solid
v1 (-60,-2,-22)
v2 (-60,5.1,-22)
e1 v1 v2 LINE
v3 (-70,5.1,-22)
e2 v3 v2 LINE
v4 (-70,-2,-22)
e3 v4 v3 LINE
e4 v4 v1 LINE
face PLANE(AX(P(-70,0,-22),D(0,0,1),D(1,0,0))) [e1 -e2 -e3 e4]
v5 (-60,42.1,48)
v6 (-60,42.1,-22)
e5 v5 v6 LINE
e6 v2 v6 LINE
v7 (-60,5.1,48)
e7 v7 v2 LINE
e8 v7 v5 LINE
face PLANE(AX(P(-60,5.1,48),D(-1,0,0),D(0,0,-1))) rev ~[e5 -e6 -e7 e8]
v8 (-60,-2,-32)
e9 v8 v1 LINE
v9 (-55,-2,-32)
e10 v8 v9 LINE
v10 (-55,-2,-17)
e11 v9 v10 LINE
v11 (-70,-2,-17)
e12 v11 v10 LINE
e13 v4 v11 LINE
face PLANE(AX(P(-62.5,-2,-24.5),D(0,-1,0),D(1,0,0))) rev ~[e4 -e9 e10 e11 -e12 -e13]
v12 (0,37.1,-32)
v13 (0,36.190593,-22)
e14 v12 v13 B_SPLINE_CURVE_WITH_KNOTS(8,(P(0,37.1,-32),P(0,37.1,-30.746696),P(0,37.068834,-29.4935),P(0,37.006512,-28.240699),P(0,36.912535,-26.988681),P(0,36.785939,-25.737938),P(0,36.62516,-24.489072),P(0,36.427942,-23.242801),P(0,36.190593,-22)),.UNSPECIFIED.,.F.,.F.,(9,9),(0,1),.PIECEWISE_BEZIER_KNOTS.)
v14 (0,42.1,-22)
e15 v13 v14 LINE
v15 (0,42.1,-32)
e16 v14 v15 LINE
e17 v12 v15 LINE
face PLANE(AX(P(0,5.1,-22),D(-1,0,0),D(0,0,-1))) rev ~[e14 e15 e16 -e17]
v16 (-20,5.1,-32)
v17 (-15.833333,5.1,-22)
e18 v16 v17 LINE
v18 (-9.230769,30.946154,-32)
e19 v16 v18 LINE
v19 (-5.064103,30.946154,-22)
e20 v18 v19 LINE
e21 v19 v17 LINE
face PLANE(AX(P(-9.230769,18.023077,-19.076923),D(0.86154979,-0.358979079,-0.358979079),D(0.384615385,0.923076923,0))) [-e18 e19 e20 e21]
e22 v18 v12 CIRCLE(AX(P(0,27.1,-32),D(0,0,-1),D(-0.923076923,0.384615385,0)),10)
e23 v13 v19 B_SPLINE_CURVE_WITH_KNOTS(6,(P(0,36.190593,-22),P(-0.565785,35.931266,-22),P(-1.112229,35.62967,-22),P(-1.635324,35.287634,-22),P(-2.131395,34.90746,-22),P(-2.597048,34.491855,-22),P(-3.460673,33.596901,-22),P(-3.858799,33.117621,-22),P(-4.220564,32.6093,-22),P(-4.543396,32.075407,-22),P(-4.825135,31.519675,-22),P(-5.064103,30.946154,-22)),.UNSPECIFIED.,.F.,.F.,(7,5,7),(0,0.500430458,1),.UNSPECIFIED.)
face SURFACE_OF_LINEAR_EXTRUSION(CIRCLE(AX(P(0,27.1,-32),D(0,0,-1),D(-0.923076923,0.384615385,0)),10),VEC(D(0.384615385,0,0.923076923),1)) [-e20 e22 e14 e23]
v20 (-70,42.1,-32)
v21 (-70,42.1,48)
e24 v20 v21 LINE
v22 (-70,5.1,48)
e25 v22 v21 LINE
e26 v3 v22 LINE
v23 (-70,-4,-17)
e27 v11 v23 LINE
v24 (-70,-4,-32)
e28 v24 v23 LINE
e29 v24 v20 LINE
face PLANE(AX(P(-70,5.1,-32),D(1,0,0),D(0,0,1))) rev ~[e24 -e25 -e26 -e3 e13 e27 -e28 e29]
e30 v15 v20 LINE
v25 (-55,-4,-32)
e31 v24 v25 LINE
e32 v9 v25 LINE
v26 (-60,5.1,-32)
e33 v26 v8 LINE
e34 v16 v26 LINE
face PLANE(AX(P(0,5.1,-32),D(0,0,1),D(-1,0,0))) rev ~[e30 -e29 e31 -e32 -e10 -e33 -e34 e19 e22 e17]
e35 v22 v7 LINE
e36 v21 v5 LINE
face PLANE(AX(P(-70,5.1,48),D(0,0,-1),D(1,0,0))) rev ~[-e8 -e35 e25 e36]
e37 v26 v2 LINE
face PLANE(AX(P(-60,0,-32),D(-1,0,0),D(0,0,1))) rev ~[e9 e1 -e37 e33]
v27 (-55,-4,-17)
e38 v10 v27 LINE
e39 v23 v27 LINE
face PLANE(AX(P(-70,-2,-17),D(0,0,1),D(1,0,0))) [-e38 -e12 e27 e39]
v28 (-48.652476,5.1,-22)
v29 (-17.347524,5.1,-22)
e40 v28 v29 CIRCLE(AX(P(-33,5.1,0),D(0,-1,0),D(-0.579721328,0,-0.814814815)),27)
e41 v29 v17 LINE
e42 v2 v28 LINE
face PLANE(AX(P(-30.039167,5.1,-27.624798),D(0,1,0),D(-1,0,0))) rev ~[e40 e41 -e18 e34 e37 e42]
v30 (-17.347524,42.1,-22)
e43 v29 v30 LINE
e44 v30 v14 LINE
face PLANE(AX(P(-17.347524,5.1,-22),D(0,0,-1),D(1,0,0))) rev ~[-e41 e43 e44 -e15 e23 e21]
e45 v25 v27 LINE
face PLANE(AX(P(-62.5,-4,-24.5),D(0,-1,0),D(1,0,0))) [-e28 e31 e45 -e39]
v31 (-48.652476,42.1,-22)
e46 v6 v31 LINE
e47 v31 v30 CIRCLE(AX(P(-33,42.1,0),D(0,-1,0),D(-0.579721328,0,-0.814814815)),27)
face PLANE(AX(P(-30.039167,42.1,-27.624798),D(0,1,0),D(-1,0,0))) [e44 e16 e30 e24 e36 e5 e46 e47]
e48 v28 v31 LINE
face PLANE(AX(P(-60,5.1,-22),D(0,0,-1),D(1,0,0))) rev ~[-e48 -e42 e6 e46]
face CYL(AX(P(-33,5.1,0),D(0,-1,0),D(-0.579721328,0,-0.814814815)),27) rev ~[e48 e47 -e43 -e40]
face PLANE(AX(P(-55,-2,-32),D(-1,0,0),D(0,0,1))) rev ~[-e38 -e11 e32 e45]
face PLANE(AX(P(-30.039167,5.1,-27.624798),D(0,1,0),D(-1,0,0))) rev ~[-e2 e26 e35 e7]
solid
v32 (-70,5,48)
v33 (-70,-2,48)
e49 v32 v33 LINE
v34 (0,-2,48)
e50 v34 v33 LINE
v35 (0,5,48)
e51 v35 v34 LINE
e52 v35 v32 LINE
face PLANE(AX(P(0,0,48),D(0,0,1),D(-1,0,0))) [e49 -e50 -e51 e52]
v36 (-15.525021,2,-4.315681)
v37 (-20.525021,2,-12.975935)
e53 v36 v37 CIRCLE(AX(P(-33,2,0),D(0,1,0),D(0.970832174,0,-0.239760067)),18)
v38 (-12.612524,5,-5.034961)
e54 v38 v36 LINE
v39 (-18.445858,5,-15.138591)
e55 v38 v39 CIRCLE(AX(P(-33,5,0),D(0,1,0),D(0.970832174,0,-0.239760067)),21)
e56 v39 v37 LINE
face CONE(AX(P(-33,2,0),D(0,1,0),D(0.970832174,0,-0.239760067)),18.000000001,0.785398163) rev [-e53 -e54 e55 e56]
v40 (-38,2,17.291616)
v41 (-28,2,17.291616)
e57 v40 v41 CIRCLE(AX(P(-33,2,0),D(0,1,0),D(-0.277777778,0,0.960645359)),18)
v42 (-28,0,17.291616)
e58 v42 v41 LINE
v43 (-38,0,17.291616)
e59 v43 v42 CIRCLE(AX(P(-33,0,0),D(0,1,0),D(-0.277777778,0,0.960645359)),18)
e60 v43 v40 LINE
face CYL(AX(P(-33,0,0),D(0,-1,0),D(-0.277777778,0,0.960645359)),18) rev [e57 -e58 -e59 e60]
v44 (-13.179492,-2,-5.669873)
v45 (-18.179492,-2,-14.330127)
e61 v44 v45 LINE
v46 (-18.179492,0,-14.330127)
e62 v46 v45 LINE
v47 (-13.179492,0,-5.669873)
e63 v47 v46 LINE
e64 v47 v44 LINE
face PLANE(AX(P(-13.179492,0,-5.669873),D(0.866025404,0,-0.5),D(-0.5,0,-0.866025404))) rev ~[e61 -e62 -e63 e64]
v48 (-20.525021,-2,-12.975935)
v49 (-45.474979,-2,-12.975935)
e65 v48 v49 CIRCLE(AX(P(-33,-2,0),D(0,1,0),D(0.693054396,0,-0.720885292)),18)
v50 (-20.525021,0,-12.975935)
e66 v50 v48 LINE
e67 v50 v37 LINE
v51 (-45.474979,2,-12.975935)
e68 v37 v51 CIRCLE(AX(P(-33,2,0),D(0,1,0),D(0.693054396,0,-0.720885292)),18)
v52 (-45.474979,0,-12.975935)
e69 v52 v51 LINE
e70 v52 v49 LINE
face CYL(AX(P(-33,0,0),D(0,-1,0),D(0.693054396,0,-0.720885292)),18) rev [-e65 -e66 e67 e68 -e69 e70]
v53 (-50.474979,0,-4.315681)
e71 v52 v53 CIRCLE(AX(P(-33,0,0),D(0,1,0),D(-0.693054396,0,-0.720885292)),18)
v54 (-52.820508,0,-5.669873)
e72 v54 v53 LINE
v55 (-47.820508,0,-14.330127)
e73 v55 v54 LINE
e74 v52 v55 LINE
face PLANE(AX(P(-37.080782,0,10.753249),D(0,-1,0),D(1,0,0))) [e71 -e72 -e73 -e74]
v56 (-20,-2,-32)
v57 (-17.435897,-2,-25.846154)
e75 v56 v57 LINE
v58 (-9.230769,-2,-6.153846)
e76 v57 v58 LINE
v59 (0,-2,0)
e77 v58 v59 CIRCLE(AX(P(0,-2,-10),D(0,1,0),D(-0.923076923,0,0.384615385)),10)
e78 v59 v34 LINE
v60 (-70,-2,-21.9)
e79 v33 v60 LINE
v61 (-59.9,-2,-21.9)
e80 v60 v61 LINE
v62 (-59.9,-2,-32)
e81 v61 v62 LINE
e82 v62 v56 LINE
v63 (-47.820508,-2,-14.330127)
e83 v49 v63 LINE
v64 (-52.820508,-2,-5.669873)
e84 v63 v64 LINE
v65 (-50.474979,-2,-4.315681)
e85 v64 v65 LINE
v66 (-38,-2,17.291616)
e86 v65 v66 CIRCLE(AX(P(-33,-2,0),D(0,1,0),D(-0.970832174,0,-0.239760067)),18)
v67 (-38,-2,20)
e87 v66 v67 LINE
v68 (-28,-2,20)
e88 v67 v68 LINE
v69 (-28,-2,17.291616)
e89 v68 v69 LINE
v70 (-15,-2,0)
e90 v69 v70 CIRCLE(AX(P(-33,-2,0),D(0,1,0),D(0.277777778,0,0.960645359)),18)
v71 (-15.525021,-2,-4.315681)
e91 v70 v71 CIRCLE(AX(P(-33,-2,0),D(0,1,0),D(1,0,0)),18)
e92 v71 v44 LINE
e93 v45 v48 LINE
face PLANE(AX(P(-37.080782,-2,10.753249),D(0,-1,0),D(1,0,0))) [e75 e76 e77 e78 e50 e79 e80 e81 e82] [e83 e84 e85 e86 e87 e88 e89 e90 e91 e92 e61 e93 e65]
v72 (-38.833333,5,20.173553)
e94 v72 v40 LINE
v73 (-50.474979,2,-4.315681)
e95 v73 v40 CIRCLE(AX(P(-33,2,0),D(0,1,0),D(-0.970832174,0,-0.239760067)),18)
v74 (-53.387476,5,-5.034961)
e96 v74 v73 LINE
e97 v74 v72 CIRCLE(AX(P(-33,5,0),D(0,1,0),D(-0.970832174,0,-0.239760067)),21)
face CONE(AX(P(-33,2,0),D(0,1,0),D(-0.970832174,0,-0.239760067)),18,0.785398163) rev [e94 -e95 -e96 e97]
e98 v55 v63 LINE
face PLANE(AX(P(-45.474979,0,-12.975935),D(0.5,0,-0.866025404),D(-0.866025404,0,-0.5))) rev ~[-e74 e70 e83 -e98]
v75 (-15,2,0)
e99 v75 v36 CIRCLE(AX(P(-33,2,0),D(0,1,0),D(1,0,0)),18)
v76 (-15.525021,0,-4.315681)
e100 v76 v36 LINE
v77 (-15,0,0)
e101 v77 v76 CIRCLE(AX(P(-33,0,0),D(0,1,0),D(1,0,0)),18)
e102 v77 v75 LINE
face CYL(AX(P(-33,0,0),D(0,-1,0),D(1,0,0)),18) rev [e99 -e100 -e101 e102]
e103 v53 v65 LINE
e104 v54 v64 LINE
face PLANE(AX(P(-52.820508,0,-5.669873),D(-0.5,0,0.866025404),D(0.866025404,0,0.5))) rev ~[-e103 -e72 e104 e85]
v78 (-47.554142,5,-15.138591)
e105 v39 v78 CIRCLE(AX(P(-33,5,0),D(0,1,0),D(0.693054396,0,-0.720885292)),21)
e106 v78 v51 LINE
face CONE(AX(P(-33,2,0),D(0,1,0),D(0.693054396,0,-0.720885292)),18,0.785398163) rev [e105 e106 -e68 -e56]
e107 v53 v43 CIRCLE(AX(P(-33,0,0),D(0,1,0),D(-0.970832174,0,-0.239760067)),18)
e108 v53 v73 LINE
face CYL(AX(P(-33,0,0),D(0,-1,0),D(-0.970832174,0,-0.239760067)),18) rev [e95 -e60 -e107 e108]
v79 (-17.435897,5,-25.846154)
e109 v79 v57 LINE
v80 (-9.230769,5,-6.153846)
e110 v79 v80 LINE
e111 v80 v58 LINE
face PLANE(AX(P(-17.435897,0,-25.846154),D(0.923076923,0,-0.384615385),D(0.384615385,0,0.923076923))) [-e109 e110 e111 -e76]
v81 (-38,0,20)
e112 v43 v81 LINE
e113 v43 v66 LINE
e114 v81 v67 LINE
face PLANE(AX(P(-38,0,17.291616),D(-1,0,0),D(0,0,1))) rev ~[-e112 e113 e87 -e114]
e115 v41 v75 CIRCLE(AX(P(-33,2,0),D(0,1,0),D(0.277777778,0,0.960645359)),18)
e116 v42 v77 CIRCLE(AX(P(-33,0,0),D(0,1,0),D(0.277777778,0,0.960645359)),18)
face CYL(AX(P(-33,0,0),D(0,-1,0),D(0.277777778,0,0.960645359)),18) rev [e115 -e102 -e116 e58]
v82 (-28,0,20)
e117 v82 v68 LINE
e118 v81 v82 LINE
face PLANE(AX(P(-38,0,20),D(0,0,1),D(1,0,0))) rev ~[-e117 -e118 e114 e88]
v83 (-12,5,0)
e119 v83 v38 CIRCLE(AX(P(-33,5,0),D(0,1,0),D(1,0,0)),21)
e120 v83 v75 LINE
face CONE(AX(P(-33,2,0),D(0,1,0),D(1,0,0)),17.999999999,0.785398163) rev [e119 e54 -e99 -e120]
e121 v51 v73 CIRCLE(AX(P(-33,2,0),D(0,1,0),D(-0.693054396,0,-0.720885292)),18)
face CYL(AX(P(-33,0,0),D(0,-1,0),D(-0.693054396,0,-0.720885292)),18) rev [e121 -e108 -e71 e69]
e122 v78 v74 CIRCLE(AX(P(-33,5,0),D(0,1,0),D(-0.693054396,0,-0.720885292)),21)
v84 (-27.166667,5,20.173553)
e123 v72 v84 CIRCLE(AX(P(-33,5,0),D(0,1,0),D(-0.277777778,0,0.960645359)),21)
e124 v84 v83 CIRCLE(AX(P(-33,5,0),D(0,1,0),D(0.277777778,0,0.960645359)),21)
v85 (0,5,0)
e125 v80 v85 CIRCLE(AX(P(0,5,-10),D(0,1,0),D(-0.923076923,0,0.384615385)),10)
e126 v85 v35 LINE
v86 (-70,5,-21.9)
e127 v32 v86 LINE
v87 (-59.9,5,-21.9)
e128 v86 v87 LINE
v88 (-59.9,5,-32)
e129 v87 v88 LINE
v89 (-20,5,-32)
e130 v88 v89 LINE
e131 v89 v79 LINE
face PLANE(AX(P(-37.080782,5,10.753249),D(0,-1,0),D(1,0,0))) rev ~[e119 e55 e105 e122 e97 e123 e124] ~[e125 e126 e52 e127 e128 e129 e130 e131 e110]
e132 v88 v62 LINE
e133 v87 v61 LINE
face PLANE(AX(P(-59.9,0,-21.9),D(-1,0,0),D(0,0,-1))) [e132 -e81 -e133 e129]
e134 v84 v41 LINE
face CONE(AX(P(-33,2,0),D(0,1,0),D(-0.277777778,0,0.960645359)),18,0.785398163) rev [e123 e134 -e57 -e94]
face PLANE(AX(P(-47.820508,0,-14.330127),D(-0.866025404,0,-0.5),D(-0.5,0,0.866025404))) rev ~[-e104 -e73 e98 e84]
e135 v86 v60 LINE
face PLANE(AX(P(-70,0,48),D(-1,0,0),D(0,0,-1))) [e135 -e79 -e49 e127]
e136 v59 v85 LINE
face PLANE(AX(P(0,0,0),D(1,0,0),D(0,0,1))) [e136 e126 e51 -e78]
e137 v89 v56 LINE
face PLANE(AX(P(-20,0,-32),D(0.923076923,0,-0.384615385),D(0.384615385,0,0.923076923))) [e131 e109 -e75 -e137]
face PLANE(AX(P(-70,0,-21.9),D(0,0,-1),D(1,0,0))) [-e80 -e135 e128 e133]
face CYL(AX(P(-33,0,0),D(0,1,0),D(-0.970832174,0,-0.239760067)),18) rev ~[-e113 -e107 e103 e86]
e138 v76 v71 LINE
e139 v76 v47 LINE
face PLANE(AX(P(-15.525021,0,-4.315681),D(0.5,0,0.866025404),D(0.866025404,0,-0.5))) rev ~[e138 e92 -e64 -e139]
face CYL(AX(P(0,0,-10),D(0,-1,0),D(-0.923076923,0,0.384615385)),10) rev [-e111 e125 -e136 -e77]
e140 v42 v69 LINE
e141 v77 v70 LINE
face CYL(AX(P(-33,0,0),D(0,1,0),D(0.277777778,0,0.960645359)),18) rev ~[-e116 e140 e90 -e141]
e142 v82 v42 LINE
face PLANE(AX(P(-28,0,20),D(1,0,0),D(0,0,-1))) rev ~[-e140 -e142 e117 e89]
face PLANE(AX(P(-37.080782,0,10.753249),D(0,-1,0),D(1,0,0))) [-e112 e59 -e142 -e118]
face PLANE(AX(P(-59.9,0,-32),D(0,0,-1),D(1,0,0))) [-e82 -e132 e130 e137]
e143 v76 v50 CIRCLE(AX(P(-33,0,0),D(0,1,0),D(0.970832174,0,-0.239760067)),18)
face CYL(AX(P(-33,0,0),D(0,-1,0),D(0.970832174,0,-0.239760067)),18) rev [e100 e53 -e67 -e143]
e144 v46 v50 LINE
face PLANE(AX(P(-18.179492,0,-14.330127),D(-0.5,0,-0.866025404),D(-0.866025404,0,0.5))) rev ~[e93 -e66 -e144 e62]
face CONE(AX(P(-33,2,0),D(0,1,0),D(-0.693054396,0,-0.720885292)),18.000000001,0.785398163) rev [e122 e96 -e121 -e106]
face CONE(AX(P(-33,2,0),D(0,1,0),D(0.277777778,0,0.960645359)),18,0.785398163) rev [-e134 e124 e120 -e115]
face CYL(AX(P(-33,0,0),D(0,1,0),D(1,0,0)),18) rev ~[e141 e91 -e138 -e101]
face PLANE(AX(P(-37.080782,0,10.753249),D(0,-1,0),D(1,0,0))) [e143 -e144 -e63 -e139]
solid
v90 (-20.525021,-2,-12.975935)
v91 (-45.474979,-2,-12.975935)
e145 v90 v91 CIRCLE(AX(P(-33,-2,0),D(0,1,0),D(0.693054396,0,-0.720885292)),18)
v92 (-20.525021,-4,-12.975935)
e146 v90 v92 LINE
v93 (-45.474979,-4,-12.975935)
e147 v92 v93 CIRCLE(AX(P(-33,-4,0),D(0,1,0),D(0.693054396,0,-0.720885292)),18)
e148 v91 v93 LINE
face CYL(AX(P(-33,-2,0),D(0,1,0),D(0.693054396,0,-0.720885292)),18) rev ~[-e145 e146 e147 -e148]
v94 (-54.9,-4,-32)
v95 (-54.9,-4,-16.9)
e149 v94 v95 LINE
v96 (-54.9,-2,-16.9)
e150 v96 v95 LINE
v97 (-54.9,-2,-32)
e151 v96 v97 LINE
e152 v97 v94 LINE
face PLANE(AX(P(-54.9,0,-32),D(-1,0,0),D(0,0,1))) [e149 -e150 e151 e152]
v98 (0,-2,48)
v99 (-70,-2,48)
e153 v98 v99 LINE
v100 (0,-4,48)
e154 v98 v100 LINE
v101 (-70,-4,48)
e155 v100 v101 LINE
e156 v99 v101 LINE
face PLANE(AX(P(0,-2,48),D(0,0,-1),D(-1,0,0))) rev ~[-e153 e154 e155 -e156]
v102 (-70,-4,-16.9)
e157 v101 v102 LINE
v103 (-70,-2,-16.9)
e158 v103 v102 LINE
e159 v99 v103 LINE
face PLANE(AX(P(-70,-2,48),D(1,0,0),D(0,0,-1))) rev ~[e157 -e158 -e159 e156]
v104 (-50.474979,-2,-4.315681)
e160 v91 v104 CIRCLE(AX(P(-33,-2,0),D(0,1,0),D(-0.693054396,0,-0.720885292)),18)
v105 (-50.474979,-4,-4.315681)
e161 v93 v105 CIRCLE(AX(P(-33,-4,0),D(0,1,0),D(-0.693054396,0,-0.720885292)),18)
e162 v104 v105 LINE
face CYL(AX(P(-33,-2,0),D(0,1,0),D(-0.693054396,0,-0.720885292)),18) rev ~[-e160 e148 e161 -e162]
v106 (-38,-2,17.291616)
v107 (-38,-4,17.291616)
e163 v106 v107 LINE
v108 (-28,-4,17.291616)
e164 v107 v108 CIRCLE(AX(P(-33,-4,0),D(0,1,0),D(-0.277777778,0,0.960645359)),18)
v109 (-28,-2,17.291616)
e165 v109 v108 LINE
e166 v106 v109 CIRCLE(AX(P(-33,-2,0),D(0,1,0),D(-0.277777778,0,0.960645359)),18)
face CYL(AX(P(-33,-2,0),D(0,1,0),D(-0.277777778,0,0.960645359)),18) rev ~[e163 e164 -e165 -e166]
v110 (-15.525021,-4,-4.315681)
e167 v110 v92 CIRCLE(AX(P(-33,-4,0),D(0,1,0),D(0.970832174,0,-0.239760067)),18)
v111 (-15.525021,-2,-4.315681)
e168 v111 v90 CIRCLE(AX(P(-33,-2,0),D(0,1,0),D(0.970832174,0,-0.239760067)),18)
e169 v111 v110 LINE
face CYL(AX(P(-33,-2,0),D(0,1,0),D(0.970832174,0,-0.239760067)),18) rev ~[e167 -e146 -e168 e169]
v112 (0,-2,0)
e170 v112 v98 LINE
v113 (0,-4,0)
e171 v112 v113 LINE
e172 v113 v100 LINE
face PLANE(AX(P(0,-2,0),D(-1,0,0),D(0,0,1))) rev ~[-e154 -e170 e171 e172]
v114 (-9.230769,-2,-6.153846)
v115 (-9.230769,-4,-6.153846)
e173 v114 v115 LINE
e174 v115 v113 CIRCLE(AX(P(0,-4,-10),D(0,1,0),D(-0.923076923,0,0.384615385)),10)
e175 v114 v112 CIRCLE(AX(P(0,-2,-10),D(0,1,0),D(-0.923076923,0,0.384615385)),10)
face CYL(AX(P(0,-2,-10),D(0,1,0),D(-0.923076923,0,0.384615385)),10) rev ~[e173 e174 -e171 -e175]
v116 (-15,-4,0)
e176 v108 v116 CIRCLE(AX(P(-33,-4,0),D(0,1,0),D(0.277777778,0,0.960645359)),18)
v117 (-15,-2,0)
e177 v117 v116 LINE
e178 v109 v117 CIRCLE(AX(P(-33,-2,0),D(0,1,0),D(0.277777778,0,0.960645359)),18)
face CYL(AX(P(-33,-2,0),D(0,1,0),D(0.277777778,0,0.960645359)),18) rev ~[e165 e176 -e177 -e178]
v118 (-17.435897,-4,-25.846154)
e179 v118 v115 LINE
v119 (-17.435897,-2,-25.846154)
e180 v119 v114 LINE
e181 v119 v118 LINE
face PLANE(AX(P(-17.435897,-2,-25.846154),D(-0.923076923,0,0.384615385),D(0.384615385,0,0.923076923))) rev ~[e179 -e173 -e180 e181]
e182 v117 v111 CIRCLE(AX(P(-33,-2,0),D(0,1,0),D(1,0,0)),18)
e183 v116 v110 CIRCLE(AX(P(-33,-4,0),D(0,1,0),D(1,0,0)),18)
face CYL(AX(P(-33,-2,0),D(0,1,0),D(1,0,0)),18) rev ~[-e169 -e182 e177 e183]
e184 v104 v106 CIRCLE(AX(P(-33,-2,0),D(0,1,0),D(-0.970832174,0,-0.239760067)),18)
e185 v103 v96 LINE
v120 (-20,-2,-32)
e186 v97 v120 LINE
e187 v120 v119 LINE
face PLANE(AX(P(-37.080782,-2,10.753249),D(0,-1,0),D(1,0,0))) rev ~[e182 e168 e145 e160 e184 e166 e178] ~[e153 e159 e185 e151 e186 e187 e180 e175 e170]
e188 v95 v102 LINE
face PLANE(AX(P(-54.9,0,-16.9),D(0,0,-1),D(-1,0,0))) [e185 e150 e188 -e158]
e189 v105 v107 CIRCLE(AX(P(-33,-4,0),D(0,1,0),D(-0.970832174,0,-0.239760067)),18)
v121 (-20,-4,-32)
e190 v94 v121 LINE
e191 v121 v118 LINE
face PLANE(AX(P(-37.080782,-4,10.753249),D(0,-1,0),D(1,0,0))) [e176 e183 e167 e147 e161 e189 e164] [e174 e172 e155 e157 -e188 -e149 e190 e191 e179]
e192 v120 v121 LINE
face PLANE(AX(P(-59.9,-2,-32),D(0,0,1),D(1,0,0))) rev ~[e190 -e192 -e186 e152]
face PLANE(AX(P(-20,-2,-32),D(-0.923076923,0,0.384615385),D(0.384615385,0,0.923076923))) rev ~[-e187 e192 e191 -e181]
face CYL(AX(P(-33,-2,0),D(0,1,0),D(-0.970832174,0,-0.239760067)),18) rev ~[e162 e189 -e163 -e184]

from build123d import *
from build123d import SkipClean  # not in build123d's __all__

# Parameters (mm, degrees)
F3_DEPTH       = 2
F4_DEPTH       = 5
F5_START       = 2
F5_DEPTH       = 2
F6_SIZE        = 3
F7_W           = 15
F7_H           = 15
F8_DEPTH       = 4
F9_START       = 2
F9_DEPTH       = 2
F2_W           = 10
F2_H           = 10
F10_DEPTH      = 5.1
F10_DEPTH_BACK = 2
F11_W          = 10
F11_H          = 10
F12_DEPTH      = 37


with BuildPart() as f3:
    # F2 (on Front) → F3 (new body)
    with BuildSketch(Plane.XZ):
        with BuildLine():
            Line((0, 0), (0, 48))
            Line((0, 48), (-70, 48))
            Line((-70, 48), (-70, -21.9))
            Line((-70, -21.9), (-59.9, -21.9))
            Line((-59.9, -21.9), (-59.9, -32))
            Line((-59.9, -32), (-26.6666666667, -32))
            Line((-26.6666666667, -32), (-20, -32))
            Line((-20, -32), (-17.4358974359, -25.8461538462))
            Line((-17.4358974359, -25.8461538462), (-9.2307692308, -6.1538461538))
            ThreePointArc((-9.2307692308, -6.1538461538), (-5.5470019623, -1.6794970566), (0, 0))
        make_face()
        with BuildLine():
            ThreePointArc((-28, 17.2916164658), (-18.6125054301, 10.8166538264), (-15, 0))
            ThreePointArc((-15, 0), (-15.1317372924, -2.1737497126), (-15.5250208681, -4.315681214))
            Line((-15.5250208681, -4.315681214), (-13.1794919243, -5.6698729811))
            Line((-13.1794919243, -5.6698729811), (-15.6794919243, -10))
            Line((-15.6794919243, -10), (-18.1794919243, -14.3301270189))
            Line((-18.1794919243, -14.3301270189), (-20.5250208681, -12.9759352518))
            ThreePointArc((-20.5250208681, -12.9759352518), (-33, -18), (-45.4749791319, -12.9759352518))
            Line((-45.4749791319, -12.9759352518), (-47.8205080757, -14.3301270189))
            Line((-47.8205080757, -14.3301270189), (-50.3205080757, -10))
            Line((-50.3205080757, -10), (-52.8205080757, -5.6698729811))
            Line((-52.8205080757, -5.6698729811), (-50.4749791319, -4.315681214))
            ThreePointArc((-50.4749791319, -4.315681214), (-48.5884572681, 9), (-38, 17.2916164658))
            Line((-38, 17.2916164658), (-38, 20))
            Line((-38, 20), (-33, 20))
            Line((-33, 20), (-28, 20))
            Line((-28, 20), (-28, 17.2916164658))
        make_face(mode=Mode.SUBTRACT)
    extrude(amount=F3_DEPTH)

    # F2 (on Front) → F4 (join)
    with BuildSketch(Plane.XZ):
        with BuildLine():
            Line((0, 0), (0, 48))
            Line((0, 48), (-70, 48))
            Line((-70, 48), (-70, -21.9))
            Line((-70, -21.9), (-59.9, -21.9))
            Line((-59.9, -21.9), (-59.9, -32))
            Line((-59.9, -32), (-26.6666666667, -32))
            Line((-26.6666666667, -32), (-20, -32))
            Line((-20, -32), (-17.4358974359, -25.8461538462))
            Line((-17.4358974359, -25.8461538462), (-9.2307692308, -6.1538461538))
            ThreePointArc((-9.2307692308, -6.1538461538), (-5.5470019623, -1.6794970566), (0, 0))
        make_face()
        with BuildLine():
            ThreePointArc((-28, 17.2916164658), (-18.6125054301, 10.8166538264), (-15, 0))
            ThreePointArc((-15, 0), (-15.1317372924, -2.1737497126), (-15.5250208681, -4.315681214))
            Line((-15.5250208681, -4.315681214), (-13.1794919243, -5.6698729811))
            Line((-13.1794919243, -5.6698729811), (-15.6794919243, -10))
            Line((-15.6794919243, -10), (-18.1794919243, -14.3301270189))
            Line((-18.1794919243, -14.3301270189), (-20.5250208681, -12.9759352518))
            ThreePointArc((-20.5250208681, -12.9759352518), (-33, -18), (-45.4749791319, -12.9759352518))
            Line((-45.4749791319, -12.9759352518), (-47.8205080757, -14.3301270189))
            Line((-47.8205080757, -14.3301270189), (-50.3205080757, -10))
            Line((-50.3205080757, -10), (-52.8205080757, -5.6698729811))
            Line((-52.8205080757, -5.6698729811), (-50.4749791319, -4.315681214))
            ThreePointArc((-50.4749791319, -4.315681214), (-48.5884572681, 9), (-38, 17.2916164658))
            Line((-38, 17.2916164658), (-38, 20))
            Line((-38, 20), (-33, 20))
            Line((-33, 20), (-28, 20))
            Line((-28, 20), (-28, 17.2916164658))
        make_face(mode=Mode.SUBTRACT)
        with BuildLine():
            ThreePointArc((-45.4749791319, -12.9759352518), (-48.5884572681, -9), (-50.4749791319, -4.315681214))
            Line((-50.4749791319, -4.315681214), (-52.8205080757, -5.6698729811))
            Line((-52.8205080757, -5.6698729811), (-50.3205080757, -10))
            Line((-50.3205080757, -10), (-47.8205080757, -14.3301270189))
            Line((-47.8205080757, -14.3301270189), (-45.4749791319, -12.9759352518))
        make_face()
        with BuildLine():
            Line((-13.1794919243, -5.6698729811), (-15.5250208681, -4.315681214))
            ThreePointArc((-15.5250208681, -4.315681214), (-17.4115427319, -9), (-20.5250208681, -12.9759352518))
            Line((-20.5250208681, -12.9759352518), (-18.1794919243, -14.3301270189))
            Line((-18.1794919243, -14.3301270189), (-15.6794919243, -10))
            Line((-15.6794919243, -10), (-13.1794919243, -5.6698729811))
        make_face()
        with BuildLine():
            ThreePointArc((-38, 17.2916164658), (-33, 18), (-28, 17.2916164658))
            Line((-28, 17.2916164658), (-28, 20))
            Line((-28, 20), (-33, 20))
            Line((-33, 20), (-38, 20))
            Line((-38, 20), (-38, 17.2916164658))
        make_face()
    with SkipClean():  # cleaning this boolean's faces spoils the solid; the shape is the same uncleaned
        extrude(amount=-F4_DEPTH)

    # F6
    f6_edges = [f3.edges().sort_by_distance(p)[0] for p in [
        (-28, 5, -17.291616),
    ]]
    chamfer(f6_edges, length=F6_SIZE)


with BuildPart() as f5:
    # F2 (on Front) → F5 (new body)
    with BuildSketch(Plane.XZ.offset(F5_START)):
        with BuildLine():
            Line((0, 0), (0, 48))
            Line((0, 48), (-70, 48))
            Line((-70, 48), (-70, -21.9))
            Line((-70, -21.9), (-59.9, -21.9))
            Line((-59.9, -21.9), (-59.9, -32))
            Line((-59.9, -32), (-26.6666666667, -32))
            Line((-26.6666666667, -32), (-20, -32))
            Line((-20, -32), (-17.4358974359, -25.8461538462))
            Line((-17.4358974359, -25.8461538462), (-9.2307692308, -6.1538461538))
            ThreePointArc((-9.2307692308, -6.1538461538), (-5.5470019623, -1.6794970566), (0, 0))
        make_face()
        with BuildLine():
            ThreePointArc((-28, 17.2916164658), (-18.6125054301, 10.8166538264), (-15, 0))
            ThreePointArc((-15, 0), (-15.1317372924, -2.1737497126), (-15.5250208681, -4.315681214))
            Line((-15.5250208681, -4.315681214), (-13.1794919243, -5.6698729811))
            Line((-13.1794919243, -5.6698729811), (-15.6794919243, -10))
            Line((-15.6794919243, -10), (-18.1794919243, -14.3301270189))
            Line((-18.1794919243, -14.3301270189), (-20.5250208681, -12.9759352518))
            ThreePointArc((-20.5250208681, -12.9759352518), (-33, -18), (-45.4749791319, -12.9759352518))
            Line((-45.4749791319, -12.9759352518), (-47.8205080757, -14.3301270189))
            Line((-47.8205080757, -14.3301270189), (-50.3205080757, -10))
            Line((-50.3205080757, -10), (-52.8205080757, -5.6698729811))
            Line((-52.8205080757, -5.6698729811), (-50.4749791319, -4.315681214))
            ThreePointArc((-50.4749791319, -4.315681214), (-48.5884572681, 9), (-38, 17.2916164658))
            Line((-38, 17.2916164658), (-38, 20))
            Line((-38, 20), (-33, 20))
            Line((-33, 20), (-28, 20))
            Line((-28, 20), (-28, 17.2916164658))
        make_face(mode=Mode.SUBTRACT)
        with BuildLine():
            ThreePointArc((-45.4749791319, -12.9759352518), (-48.5884572681, -9), (-50.4749791319, -4.315681214))
            Line((-50.4749791319, -4.315681214), (-52.8205080757, -5.6698729811))
            Line((-52.8205080757, -5.6698729811), (-50.3205080757, -10))
            Line((-50.3205080757, -10), (-47.8205080757, -14.3301270189))
            Line((-47.8205080757, -14.3301270189), (-45.4749791319, -12.9759352518))
        make_face()
        with BuildLine():
            Line((-13.1794919243, -5.6698729811), (-15.5250208681, -4.315681214))
            ThreePointArc((-15.5250208681, -4.315681214), (-17.4115427319, -9), (-20.5250208681, -12.9759352518))
            Line((-20.5250208681, -12.9759352518), (-18.1794919243, -14.3301270189))
            Line((-18.1794919243, -14.3301270189), (-15.6794919243, -10))
            Line((-15.6794919243, -10), (-13.1794919243, -5.6698729811))
        make_face()
        with BuildLine():
            ThreePointArc((-38, 17.2916164658), (-33, 18), (-28, 17.2916164658))
            Line((-28, 17.2916164658), (-28, 20))
            Line((-28, 20), (-33, 20))
            Line((-33, 20), (-38, 20))
            Line((-38, 20), (-38, 17.2916164658))
        make_face()
    extrude(amount=F5_DEPTH)

    # F7 (on Front) → F8 (cut)
    with BuildSketch(Plane.XZ):
        with Locations((-62.5, -24.5)):
            Rectangle(F7_W, F7_H)
        Polygon((-55, -17), (-55, -32), (-54.9, -32), (-54.9, -16.9), (-70, -16.9), (-70, -17), align=None)
    extrude(amount=F8_DEPTH, mode=Mode.SUBTRACT)


with BuildPart() as f9:
    # F7 (on Front) → F9 (new body)
    with BuildSketch(Plane.XZ.offset(F9_START)):
        with Locations((-62.5, -24.5)):
            Rectangle(F7_W, F7_H)
    extrude(amount=F9_DEPTH)

    # F2 (on Front) → F10 (join, two sides)
    with BuildSketch(Plane.XZ) as f10_sk:
        with Locations((-65, -27)):
            Rectangle(F2_W, F2_H)
    extrude(amount=-F10_DEPTH)
    extrude(f10_sk.sketch, amount=F10_DEPTH_BACK)

    # F11 (on face) → F12 (join)
    with BuildSketch(Plane(origin=(0, 5.1, 0), x_dir=(-1, 0, 0), z_dir=(0, 1, 0))):
        with BuildLine():
            Line((0, -32), (60, -32))
            Line((60, -32), (60, -22))
            Line((60, -22), (48.6524758425, -22))
            ThreePointArc((48.6524758425, -22), (33, -27), (17.3475241575, -22))
            Line((17.3475241575, -22), (0, -22))
            Line((0, -22), (0, -32))
        make_face()
        Polygon((60, -22), (70, -22), (70, 48), (60, 48), (60, 0), align=None)
        with Locations((65, -27)):
            Rectangle(F11_W, F11_H)
    extrude(amount=F12_DEPTH)

    # F14: sweep along a path in F14_path
    with BuildLine(Plane(origin=(-20, 5, -32), x_dir=(-0.3846153846, 0, -0.9230769231), z_dir=(-0.9230769231, 0, 0.3846153846))) as f14_path:
        Line((0, 0), (-28, 0))
    # F13 (on face) → F14 (sweep, cut)
    with BuildSketch(Plane(origin=(0, 0, -32), x_dir=(1, 0, 0), z_dir=(0, 0, -1))):
        with BuildLine():
            Line((0, -5.1), (-20, -5.1))
            Line((-20, -5.1), (-9.2307692308, -30.9461538462))
            ThreePointArc((-9.2307692308, -30.9461538462), (-5.5470019623, -35.4205029434), (0, -37.1))
            Line((0, -37.1), (0, -5.1))
        make_face()
    sweep(path=f14_path.line, mode=Mode.SUBTRACT)


solid = Compound([f3.part, f5.part, f9.part])
